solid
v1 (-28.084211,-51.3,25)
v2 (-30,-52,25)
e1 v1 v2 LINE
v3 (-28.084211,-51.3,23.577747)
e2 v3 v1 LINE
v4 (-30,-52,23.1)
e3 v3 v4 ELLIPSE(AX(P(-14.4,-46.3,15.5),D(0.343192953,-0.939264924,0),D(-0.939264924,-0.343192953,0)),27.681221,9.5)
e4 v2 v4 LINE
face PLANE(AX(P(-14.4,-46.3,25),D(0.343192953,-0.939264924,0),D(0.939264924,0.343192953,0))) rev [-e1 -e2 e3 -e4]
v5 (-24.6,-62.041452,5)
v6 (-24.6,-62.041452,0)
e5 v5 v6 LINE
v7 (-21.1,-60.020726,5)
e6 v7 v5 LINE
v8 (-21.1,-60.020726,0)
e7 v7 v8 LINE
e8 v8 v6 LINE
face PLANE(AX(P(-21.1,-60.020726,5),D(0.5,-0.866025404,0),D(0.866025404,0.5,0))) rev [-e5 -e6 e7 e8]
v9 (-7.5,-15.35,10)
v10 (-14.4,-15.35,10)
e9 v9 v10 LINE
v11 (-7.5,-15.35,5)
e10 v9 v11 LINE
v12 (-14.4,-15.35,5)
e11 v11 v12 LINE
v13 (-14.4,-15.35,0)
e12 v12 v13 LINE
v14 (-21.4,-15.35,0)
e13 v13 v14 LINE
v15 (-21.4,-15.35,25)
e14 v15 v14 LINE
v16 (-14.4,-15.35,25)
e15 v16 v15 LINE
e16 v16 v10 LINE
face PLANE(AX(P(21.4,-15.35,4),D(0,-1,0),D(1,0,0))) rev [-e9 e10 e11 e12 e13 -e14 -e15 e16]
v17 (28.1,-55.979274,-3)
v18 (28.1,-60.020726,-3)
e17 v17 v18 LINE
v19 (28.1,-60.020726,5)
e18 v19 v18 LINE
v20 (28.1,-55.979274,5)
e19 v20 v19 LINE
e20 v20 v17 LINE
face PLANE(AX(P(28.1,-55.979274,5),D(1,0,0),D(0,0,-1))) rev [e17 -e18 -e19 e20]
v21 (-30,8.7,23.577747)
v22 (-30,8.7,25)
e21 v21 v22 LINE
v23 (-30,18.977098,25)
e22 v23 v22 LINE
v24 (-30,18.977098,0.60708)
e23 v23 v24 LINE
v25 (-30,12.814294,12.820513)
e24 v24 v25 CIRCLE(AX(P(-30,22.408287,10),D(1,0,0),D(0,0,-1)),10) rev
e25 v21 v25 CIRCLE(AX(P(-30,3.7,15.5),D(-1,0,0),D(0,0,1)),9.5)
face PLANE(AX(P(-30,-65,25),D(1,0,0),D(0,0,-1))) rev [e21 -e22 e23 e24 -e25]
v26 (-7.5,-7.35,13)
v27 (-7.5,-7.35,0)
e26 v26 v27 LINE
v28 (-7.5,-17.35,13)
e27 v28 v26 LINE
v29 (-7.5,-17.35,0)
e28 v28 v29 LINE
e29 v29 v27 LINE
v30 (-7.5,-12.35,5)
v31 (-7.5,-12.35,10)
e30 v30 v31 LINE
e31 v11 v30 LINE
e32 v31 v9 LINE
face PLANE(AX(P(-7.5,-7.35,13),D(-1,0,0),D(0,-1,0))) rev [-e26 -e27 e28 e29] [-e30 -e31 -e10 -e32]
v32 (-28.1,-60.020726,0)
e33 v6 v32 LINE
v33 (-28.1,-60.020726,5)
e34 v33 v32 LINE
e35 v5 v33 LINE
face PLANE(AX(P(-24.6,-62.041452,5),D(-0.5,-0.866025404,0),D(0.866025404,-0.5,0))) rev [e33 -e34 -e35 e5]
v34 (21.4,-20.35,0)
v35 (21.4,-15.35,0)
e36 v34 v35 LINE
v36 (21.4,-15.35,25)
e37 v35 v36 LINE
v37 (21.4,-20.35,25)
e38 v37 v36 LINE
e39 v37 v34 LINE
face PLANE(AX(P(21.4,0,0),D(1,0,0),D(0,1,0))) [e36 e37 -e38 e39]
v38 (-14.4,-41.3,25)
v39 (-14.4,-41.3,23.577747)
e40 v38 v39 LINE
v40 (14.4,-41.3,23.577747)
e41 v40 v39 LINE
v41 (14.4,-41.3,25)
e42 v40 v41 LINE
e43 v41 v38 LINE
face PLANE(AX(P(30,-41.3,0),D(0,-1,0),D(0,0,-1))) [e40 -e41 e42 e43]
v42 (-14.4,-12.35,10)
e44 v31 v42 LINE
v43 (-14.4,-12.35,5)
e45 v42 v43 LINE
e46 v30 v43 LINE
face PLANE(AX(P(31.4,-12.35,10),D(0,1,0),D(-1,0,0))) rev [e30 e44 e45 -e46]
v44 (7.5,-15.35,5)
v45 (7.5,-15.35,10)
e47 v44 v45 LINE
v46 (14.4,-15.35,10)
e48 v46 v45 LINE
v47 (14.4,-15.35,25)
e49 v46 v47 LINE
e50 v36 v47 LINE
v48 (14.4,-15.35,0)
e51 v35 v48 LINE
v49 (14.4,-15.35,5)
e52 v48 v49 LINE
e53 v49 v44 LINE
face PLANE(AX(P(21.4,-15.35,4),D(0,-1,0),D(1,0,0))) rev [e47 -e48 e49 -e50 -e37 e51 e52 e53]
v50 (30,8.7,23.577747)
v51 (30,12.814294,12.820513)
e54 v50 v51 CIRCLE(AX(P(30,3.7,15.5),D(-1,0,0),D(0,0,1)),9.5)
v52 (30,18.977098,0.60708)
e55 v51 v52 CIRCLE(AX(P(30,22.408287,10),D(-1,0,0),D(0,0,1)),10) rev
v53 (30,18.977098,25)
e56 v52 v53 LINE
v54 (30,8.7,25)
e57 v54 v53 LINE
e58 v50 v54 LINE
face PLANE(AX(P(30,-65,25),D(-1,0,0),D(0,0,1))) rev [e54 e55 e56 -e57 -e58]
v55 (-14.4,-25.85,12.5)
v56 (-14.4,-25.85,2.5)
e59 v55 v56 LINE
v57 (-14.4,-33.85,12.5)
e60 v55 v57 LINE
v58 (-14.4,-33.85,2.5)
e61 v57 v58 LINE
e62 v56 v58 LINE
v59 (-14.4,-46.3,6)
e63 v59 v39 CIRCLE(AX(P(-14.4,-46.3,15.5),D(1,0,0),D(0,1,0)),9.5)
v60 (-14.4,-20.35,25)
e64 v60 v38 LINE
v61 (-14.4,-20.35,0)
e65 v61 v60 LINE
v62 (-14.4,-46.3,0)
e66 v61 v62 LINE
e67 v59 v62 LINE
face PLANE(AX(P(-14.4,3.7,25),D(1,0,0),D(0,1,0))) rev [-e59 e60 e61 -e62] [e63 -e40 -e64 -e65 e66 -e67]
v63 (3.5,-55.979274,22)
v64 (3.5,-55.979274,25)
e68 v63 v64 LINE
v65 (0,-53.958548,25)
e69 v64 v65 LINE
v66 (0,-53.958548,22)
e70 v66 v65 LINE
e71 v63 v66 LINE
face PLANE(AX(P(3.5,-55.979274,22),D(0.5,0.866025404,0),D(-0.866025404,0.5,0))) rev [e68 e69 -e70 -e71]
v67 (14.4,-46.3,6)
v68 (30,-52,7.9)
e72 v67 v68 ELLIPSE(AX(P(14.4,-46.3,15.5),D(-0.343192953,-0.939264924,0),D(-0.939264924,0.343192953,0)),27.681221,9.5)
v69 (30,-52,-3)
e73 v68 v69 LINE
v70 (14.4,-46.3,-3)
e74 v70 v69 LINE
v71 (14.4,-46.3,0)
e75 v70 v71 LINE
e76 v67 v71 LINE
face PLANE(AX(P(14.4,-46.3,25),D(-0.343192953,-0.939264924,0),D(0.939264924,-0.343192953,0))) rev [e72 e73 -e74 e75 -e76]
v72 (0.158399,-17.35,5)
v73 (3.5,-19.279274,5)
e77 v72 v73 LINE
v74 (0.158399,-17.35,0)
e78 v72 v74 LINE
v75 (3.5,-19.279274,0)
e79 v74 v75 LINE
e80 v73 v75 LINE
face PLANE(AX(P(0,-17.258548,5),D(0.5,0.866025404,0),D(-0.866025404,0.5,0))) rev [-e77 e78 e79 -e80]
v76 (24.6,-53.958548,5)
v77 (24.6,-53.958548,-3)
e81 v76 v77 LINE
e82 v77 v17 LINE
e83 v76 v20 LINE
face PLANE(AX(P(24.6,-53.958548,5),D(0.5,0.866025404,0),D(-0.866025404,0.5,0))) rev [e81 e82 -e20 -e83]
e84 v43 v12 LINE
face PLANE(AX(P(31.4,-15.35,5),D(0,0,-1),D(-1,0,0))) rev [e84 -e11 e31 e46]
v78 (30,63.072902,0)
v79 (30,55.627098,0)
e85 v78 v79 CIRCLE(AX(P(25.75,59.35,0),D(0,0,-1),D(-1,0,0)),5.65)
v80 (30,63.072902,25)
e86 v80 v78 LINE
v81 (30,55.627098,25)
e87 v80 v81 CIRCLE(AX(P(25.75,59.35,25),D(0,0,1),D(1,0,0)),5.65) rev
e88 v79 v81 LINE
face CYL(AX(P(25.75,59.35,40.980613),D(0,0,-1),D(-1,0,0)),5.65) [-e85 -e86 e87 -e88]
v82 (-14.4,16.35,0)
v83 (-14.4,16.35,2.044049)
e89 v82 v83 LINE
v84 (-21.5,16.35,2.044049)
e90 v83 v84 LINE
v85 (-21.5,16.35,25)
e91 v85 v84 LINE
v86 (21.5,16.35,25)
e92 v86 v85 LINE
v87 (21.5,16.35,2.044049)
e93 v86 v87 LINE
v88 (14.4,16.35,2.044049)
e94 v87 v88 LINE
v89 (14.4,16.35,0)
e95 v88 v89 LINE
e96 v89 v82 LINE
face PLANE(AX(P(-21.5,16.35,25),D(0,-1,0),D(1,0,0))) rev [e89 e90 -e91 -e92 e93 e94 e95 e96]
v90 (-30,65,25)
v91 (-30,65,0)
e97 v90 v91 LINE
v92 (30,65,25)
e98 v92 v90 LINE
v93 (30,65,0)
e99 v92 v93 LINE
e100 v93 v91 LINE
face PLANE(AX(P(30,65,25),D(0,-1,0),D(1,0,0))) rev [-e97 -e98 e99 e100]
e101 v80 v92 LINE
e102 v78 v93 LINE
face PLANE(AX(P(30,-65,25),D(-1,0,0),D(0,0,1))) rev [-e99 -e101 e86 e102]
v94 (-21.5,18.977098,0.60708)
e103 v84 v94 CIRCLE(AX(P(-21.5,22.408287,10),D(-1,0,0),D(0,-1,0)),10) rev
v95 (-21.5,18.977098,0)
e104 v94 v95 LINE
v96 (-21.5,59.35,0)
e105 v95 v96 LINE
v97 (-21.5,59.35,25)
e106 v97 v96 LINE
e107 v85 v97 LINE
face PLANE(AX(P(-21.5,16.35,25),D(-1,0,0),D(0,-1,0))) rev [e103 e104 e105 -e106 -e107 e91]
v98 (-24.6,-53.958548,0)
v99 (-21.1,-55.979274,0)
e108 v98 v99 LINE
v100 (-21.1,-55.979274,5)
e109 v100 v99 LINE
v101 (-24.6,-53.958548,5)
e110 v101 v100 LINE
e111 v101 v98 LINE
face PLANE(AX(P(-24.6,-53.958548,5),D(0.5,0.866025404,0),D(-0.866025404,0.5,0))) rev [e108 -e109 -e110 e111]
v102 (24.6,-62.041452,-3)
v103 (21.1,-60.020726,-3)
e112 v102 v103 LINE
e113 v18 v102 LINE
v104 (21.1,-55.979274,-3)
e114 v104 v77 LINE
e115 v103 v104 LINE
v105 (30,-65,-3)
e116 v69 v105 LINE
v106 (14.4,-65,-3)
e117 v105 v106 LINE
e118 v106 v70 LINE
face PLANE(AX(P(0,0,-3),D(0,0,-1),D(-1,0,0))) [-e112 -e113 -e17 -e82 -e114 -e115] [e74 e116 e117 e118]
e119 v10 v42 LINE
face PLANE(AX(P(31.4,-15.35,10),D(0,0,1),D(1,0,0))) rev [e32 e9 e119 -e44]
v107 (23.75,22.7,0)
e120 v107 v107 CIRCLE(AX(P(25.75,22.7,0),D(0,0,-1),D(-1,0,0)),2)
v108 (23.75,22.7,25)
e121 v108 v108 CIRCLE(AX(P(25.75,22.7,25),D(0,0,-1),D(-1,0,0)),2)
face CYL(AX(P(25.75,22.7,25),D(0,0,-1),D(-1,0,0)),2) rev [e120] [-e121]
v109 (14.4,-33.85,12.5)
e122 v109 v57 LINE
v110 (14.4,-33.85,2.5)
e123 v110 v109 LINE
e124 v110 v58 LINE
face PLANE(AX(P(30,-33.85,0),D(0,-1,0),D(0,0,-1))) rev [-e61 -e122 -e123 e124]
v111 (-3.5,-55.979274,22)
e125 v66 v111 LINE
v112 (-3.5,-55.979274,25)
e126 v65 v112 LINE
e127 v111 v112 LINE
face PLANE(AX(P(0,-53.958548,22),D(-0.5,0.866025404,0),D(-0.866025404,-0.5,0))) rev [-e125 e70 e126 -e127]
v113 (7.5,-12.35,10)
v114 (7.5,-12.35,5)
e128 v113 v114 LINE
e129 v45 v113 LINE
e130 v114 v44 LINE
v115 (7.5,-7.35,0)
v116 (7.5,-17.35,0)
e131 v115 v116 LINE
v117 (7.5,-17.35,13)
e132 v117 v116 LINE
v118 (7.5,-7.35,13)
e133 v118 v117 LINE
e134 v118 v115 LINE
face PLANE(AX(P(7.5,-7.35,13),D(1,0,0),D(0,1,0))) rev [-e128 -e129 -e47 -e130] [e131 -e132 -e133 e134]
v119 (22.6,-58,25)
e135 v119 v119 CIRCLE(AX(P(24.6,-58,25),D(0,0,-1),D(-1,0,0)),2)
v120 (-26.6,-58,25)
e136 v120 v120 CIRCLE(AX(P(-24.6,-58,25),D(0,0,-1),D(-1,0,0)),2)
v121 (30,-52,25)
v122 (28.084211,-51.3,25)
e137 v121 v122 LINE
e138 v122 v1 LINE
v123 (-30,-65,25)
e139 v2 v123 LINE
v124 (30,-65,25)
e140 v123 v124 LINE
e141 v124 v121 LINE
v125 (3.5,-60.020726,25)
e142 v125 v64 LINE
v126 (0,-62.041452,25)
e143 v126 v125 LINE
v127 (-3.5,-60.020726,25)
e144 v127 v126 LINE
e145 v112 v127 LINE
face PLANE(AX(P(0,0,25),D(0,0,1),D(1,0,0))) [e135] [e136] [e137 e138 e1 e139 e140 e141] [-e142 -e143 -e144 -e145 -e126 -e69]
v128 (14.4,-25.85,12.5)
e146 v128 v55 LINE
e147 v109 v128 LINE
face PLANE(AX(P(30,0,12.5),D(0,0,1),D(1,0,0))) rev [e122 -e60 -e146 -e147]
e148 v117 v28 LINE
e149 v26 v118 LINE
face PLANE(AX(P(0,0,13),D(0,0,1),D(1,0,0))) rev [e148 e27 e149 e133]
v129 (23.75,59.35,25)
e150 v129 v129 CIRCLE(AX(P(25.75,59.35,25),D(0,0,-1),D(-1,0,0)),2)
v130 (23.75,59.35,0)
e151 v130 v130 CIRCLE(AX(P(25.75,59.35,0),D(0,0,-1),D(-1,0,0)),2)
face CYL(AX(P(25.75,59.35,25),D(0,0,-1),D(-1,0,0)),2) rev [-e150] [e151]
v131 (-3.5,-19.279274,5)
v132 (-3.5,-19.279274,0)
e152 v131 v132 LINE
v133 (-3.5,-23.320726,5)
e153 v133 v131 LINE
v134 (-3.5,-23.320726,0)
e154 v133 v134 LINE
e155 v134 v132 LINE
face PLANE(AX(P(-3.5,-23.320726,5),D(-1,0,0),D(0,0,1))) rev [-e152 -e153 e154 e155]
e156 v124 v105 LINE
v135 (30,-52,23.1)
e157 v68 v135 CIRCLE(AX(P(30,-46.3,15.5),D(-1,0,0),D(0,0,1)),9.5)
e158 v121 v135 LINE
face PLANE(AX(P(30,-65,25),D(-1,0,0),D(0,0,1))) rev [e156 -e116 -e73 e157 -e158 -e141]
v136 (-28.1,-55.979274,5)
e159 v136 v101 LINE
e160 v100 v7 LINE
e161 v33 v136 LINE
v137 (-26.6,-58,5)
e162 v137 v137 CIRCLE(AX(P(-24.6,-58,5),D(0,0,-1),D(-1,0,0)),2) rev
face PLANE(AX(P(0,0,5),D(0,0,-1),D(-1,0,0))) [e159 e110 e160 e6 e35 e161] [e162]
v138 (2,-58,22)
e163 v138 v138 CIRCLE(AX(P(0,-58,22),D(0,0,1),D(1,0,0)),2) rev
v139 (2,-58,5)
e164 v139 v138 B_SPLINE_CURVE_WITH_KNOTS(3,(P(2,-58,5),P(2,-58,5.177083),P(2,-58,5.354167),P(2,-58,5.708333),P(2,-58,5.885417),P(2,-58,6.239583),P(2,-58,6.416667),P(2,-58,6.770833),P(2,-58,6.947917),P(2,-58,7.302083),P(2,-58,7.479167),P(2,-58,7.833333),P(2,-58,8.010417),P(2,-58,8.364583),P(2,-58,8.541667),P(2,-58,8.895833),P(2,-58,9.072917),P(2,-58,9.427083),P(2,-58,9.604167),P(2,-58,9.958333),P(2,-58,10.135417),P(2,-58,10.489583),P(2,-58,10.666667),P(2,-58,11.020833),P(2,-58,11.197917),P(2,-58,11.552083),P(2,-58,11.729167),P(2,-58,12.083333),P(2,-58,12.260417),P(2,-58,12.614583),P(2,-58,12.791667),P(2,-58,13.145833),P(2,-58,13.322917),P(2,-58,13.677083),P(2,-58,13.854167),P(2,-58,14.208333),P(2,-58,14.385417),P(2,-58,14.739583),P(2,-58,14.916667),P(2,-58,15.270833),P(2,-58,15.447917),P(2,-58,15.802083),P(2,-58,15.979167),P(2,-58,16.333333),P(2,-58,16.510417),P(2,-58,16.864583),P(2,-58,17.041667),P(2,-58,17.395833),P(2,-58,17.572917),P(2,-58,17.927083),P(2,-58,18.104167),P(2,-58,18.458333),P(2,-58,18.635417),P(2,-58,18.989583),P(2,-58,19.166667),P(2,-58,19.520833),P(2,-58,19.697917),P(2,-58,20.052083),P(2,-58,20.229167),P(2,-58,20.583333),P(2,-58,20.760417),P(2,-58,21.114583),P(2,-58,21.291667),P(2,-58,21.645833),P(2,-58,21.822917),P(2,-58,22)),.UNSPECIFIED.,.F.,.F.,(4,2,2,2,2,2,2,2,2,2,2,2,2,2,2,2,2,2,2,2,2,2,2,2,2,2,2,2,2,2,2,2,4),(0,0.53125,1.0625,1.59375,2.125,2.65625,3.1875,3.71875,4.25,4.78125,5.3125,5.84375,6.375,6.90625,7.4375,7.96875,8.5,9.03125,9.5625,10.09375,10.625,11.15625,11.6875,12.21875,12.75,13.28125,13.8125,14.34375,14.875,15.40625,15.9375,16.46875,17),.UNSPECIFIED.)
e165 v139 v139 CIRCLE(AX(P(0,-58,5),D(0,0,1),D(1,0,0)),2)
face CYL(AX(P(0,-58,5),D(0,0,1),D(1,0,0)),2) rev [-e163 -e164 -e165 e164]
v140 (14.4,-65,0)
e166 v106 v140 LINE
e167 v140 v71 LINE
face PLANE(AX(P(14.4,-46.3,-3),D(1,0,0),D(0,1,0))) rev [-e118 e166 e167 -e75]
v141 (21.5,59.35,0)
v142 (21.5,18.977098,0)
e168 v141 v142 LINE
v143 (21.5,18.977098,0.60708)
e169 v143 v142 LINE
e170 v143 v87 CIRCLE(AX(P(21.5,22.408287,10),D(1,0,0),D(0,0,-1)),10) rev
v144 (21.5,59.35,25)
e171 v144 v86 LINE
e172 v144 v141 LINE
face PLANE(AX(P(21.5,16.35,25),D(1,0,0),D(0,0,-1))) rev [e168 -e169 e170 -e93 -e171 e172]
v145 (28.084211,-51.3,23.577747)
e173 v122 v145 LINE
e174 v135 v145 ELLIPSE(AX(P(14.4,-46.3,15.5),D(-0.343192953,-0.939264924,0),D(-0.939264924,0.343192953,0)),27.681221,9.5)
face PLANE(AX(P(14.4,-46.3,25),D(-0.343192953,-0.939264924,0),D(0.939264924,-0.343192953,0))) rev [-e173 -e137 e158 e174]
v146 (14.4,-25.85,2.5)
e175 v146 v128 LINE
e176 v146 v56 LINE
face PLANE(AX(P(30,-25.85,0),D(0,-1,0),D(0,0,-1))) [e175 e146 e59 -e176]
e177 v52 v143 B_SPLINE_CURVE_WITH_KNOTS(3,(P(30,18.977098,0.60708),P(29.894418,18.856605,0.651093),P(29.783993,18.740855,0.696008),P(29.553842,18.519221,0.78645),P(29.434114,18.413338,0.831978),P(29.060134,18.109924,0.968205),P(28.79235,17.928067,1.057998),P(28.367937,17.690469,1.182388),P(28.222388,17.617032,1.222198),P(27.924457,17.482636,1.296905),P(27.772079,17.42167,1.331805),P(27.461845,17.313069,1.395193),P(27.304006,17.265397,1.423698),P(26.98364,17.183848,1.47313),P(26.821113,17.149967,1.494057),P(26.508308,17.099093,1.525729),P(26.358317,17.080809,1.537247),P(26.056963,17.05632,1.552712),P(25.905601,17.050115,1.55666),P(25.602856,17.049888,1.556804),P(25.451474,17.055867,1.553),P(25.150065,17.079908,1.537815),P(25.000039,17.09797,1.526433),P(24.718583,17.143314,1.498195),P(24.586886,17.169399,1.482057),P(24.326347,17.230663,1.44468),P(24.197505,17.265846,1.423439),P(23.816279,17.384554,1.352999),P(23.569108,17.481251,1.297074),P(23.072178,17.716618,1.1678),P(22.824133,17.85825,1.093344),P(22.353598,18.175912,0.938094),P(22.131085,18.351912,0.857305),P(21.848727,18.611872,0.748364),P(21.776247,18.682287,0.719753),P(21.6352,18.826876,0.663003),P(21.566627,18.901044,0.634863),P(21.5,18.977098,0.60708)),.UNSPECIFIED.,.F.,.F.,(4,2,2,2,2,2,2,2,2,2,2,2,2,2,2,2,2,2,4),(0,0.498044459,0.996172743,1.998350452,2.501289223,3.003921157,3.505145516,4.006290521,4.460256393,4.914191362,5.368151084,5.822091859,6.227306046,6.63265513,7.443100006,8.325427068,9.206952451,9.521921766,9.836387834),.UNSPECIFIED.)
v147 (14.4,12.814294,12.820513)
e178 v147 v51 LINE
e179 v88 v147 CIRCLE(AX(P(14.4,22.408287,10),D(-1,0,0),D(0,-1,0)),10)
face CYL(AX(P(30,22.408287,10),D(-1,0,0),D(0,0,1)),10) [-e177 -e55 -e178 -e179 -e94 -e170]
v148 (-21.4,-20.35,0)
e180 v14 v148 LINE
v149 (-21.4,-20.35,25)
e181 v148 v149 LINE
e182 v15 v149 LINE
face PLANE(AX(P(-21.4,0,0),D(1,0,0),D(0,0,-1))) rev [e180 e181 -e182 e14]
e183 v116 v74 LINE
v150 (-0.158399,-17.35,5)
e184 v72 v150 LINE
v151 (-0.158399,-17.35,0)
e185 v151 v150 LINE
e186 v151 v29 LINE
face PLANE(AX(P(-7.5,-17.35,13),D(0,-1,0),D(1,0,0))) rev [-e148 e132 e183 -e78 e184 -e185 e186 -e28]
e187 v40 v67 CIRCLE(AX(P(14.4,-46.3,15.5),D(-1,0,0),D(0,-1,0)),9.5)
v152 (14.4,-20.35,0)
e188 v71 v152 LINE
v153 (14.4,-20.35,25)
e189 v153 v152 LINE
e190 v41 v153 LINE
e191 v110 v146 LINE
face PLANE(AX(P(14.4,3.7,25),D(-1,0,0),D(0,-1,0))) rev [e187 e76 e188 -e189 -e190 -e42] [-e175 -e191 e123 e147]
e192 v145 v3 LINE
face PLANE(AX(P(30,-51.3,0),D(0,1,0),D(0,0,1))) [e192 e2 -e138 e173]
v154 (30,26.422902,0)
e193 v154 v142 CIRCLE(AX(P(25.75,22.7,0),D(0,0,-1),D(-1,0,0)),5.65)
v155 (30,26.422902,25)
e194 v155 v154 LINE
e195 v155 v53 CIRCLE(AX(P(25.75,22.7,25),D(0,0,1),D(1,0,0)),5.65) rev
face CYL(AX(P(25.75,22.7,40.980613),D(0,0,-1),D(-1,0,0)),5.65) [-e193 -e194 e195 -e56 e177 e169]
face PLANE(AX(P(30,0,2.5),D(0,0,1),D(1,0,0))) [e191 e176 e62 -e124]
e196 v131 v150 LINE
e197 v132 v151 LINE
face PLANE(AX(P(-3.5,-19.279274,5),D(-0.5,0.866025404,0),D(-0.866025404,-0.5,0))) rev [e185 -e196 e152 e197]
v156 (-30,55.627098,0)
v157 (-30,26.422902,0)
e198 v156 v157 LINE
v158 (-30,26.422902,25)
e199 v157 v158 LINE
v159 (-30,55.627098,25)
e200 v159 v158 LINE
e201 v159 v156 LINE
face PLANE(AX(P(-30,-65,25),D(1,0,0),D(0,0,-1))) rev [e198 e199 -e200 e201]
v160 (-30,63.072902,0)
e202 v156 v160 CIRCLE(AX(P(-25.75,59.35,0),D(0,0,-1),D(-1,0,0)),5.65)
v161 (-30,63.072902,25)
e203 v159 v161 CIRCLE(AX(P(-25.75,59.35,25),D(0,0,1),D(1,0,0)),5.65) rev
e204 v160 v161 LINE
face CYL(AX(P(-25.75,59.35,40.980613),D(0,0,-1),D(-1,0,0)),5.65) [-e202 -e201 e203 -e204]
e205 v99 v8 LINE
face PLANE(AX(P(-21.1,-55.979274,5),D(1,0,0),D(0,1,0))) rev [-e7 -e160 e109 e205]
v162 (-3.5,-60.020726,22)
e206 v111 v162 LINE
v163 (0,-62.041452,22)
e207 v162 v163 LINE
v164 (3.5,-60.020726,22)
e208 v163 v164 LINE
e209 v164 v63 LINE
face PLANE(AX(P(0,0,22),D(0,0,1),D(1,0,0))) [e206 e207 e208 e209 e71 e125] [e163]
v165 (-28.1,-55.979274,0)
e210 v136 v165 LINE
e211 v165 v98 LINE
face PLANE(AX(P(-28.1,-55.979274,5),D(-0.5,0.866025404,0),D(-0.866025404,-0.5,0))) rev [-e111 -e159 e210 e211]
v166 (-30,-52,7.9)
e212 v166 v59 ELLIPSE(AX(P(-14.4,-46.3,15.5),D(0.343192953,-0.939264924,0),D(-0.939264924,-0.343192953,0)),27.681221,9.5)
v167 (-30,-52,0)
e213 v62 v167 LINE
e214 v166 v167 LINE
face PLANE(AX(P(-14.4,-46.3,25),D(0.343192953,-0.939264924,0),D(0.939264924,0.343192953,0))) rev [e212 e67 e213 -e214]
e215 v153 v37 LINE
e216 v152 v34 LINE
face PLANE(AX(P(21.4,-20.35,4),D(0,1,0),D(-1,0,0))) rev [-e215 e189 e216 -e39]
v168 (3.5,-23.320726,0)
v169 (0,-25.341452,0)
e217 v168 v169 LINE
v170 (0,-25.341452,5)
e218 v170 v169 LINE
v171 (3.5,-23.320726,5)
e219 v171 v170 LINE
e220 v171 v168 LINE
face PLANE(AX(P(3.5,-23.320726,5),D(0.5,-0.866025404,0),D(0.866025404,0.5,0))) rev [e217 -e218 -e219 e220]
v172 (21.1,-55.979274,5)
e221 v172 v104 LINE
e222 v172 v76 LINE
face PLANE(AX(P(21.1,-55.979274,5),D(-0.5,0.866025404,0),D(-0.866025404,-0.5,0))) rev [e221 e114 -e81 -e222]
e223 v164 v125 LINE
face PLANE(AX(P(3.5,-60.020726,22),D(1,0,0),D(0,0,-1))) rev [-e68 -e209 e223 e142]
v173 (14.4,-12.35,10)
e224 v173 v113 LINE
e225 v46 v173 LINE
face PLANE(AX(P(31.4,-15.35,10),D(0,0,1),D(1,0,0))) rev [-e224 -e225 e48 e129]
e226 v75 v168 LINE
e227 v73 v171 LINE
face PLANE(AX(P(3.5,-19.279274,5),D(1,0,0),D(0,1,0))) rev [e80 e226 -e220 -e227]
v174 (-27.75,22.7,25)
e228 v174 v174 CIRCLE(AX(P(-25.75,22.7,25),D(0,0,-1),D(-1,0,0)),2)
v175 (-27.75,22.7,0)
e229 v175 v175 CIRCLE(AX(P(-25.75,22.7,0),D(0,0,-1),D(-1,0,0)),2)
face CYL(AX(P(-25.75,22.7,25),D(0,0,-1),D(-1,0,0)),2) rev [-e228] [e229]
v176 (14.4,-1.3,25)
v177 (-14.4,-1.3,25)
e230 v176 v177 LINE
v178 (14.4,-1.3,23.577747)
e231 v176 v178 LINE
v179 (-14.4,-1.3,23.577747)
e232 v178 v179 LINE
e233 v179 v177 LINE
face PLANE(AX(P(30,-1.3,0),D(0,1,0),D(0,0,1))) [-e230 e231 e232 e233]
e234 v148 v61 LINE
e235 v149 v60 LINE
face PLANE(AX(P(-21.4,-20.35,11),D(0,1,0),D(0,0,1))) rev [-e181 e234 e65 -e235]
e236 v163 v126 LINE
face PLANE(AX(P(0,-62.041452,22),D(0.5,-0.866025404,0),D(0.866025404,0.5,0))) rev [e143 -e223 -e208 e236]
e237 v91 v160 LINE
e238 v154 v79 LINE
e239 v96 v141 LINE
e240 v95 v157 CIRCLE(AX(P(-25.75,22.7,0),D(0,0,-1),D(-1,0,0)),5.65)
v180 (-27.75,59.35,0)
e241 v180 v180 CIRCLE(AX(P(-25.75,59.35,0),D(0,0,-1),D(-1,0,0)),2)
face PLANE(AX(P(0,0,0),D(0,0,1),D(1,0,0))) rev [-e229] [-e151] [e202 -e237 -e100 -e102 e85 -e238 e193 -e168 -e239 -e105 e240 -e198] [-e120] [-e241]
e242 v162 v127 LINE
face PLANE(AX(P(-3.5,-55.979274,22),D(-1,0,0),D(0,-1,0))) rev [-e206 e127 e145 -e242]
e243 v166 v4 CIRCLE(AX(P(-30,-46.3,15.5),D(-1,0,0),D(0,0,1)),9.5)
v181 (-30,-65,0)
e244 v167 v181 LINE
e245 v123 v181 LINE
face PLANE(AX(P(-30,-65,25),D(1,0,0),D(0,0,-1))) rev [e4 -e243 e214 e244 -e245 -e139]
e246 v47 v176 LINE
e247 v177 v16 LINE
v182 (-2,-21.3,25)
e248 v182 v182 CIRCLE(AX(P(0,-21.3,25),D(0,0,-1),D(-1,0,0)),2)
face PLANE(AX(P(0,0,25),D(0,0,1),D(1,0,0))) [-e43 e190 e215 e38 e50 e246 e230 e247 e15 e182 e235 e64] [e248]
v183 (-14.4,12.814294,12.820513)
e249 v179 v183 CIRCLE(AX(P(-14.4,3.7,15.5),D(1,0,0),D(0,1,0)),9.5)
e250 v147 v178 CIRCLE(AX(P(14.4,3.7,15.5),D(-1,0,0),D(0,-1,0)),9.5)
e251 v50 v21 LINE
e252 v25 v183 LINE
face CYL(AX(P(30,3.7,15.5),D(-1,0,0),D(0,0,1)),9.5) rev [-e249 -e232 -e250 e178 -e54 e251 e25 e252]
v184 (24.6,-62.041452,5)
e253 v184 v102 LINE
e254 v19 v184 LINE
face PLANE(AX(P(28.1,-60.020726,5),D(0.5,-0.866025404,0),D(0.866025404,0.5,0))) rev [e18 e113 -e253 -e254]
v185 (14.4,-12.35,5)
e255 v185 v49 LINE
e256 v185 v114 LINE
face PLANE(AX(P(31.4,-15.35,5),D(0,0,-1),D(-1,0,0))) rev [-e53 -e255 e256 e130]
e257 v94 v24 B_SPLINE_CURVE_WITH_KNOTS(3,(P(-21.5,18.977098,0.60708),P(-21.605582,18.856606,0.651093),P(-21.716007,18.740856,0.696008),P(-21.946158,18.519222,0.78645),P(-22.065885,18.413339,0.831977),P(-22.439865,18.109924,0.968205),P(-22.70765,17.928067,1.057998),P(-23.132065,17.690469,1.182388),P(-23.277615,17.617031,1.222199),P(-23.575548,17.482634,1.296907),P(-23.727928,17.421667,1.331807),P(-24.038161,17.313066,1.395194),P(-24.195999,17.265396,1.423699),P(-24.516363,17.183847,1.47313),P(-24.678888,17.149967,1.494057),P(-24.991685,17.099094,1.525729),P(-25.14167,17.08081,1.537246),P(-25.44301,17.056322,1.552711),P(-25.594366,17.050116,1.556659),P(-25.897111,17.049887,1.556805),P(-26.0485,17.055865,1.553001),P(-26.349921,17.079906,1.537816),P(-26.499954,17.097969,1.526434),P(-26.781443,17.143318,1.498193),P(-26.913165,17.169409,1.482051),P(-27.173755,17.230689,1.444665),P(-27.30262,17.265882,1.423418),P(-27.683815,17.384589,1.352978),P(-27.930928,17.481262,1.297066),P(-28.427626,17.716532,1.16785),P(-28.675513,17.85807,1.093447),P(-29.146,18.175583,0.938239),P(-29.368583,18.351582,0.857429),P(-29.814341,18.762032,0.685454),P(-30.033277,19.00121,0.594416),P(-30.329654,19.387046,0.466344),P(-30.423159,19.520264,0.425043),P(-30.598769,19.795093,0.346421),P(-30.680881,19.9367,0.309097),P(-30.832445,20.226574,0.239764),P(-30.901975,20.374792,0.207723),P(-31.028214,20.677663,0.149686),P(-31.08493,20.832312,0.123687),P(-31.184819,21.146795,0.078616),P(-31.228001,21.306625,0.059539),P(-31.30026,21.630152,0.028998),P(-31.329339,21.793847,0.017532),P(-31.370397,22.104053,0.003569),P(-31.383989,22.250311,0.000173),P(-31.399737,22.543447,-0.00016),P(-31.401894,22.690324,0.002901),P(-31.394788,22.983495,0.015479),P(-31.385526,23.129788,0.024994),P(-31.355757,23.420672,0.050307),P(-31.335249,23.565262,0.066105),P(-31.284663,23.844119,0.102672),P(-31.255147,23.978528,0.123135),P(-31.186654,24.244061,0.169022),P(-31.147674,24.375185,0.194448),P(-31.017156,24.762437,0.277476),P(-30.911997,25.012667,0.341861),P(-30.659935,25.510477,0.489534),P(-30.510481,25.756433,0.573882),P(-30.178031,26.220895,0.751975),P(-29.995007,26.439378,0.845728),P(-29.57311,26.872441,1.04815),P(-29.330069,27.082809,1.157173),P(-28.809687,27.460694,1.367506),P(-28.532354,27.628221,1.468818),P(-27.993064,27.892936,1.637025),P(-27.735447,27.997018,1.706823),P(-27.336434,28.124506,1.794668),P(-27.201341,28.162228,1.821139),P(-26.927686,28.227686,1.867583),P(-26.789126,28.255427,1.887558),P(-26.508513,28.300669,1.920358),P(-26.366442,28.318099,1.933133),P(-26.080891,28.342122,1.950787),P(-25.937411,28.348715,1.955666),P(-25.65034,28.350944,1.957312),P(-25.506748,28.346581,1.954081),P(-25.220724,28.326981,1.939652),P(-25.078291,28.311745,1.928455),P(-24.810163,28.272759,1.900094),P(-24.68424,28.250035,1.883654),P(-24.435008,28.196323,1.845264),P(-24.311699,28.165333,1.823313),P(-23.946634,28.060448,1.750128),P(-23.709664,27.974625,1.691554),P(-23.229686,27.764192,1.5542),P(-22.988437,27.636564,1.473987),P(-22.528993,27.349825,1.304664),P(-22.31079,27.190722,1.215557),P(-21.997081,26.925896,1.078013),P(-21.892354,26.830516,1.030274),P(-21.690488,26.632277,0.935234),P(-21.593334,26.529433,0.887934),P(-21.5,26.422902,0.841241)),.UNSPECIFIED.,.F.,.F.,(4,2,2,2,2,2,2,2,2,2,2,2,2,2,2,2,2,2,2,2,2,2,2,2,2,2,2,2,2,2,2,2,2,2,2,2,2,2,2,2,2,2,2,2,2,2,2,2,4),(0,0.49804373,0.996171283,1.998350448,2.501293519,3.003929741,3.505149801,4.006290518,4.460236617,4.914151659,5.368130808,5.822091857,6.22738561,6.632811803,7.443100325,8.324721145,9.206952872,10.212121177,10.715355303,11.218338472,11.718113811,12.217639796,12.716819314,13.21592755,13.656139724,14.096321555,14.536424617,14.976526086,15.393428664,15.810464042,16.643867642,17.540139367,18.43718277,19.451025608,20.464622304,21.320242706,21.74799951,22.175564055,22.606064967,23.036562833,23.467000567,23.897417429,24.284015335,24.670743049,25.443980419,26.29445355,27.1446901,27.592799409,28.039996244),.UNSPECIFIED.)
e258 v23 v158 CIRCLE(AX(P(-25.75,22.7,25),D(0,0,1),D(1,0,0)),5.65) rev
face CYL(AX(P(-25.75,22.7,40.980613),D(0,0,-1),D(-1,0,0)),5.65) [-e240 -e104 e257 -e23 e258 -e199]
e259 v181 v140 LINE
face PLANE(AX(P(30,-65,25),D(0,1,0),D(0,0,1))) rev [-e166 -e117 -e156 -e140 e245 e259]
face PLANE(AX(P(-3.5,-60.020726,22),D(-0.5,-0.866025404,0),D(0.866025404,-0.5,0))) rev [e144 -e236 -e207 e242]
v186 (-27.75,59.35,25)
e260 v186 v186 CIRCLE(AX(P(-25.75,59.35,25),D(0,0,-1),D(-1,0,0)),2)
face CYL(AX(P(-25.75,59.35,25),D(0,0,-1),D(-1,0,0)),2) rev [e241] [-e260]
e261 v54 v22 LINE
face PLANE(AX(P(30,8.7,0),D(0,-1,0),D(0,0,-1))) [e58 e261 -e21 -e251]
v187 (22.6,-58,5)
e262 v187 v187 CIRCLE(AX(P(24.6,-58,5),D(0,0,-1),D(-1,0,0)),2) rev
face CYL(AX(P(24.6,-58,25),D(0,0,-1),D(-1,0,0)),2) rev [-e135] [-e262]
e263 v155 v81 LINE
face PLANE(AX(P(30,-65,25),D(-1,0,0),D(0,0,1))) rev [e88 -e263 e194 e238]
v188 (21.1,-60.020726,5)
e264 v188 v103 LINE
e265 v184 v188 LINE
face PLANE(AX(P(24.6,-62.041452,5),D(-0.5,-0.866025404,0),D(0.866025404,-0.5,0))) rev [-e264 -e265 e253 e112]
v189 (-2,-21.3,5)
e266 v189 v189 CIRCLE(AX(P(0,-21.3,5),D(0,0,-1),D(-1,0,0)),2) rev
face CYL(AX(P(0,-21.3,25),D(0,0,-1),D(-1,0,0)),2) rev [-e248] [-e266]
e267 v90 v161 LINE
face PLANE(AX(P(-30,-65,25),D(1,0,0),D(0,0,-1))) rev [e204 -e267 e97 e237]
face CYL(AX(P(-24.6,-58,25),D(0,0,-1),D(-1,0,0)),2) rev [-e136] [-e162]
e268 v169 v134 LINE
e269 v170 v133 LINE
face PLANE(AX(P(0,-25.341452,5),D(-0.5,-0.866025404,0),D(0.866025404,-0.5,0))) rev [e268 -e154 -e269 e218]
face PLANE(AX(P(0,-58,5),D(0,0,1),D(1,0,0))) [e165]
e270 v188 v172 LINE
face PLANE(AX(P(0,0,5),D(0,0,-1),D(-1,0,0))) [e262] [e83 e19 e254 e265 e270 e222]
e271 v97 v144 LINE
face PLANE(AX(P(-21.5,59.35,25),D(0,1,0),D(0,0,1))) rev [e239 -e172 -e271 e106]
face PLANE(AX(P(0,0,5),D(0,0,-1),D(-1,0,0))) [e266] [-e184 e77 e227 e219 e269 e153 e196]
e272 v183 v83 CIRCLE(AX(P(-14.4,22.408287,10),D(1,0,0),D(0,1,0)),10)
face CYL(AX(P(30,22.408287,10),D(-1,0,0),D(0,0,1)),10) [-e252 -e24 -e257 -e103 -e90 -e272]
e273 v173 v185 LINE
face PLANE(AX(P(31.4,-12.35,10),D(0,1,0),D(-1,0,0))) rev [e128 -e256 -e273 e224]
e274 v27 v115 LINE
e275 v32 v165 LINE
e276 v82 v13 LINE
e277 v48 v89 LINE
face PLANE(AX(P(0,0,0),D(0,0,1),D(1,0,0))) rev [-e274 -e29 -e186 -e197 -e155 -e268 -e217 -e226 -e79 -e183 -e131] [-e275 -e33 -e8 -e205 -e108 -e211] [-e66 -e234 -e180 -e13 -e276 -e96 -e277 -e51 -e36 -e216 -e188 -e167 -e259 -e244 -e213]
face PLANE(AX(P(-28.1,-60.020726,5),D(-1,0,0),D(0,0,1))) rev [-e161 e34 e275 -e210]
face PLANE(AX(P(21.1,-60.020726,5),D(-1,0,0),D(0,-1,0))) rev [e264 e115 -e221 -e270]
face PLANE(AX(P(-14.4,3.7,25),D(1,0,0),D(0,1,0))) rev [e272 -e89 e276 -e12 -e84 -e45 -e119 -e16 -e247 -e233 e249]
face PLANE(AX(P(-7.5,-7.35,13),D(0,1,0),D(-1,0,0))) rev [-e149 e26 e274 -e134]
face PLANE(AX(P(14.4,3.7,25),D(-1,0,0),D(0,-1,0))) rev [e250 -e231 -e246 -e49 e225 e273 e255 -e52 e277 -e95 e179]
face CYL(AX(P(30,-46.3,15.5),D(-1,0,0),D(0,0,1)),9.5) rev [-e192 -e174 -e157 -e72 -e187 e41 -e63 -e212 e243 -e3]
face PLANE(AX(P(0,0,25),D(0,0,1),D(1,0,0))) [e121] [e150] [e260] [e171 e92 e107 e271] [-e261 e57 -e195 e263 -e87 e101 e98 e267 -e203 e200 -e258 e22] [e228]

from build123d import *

# Parameters (mm, degrees)
SKETCH_1_W          = 60
SKETCH_1_H          = 130
EXTRUDE_1_DEPTH     = 25
SKETCH_2_W          = 43
SKETCH_2_H          = 43
CUT_EXTRUDE_1_DEPTH = 76.828754441
SKETCH_3_W          = 10
SKETCH_3_H          = 8
CUT_EXTRUDE_2_DEPTH = 92.923881554
FILLET_1_R          = 20
FILLET_2_R          = 10
SKETCH_4_R          = 2
CUT_EXTRUDE_3_DEPTH = 76.828754441
EXTRUDE_2_REACH     = 77.829
SKETCH_5_R          = 4.25
SKETCH_5_R_2        = 2
SKETCH_6_R          = 2
EXTRUDE_3_DEPTH     = 25
CUT_EXTRUDE_4_DEPTH = 5
SKETCH_8_R          = 2
CUT_EXTRUDE_5_DEPTH = 20
CUT_EXTRUDE_6_DEPTH = 3
SKETCH_11_W         = 7
SKETCH_11_H         = 5
EXTRUDE_5_DEPTH     = 7
SKETCH_12_W         = 7
SKETCH_12_H         = 5
EXTRUDE_6_DEPTH     = 7
SKETCH_13_W         = 7
SKETCH_13_H         = 5
EXTRUDE_7_DEPTH     = 4
SKETCH_17_W         = 7
SKETCH_17_H         = 5
EXTRUDE_8_DEPTH     = 14
EXTRUDE_9_DEPTH     = 3
SKETCH_19_W         = 5
SKETCH_19_H         = 3
CUT_EXTRUDE_7_DEPTH = 84.352504546
SKETCH_20_W         = 15
SKETCH_20_H         = 10
CUT_EXTRUDE_8_DEPTH = 13


with BuildPart() as part:
    # Эскиз1 → Бобышка-Вытянуть1 (new body)
    with BuildSketch(Plane.XY):
        Rectangle(SKETCH_1_W, SKETCH_1_H)
    extrude(amount=EXTRUDE_1_DEPTH)

    # Эскиз2 → Вырез-Вытянуть1 (cut, through all)
    with BuildSketch(Plane(origin=(0, 0, 0), x_dir=(-1, 0, 0), z_dir=(0, 0, -1))):
        Polygon((-30, 3.7), (-14.4, 3.7), (-14.4, -46.3), (-30, -52), align=None)
        with Locations((0, 37.85)):
            Rectangle(SKETCH_2_W, SKETCH_2_H)
        Polygon((14.4, -46.3), (30, -52), (30, 3.7), (14.4, 3.7), align=None)
    extrude(amount=-CUT_EXTRUDE_1_DEPTH, mode=Mode.SUBTRACT)

    # Эскиз3 → Вырез-Вытянуть2 (cut, through all)
    with BuildSketch(Plane.ZY.offset(30)):
        with BuildLine():
            Line((23.577747211, 8.7), (25, 8.7))
            Line((25, 8.7), (25, 3.7))
            Line((25, 3.7), (25, -1.3))
            Line((25, -1.3), (23.577747211, -1.3))
            ThreePointArc((23.577747211, -1.3), (6, 3.7), (23.577747211, 8.7))
        make_face()
        with BuildLine():
            Line((25, -41.3), (23.577747211, -41.3))
            ThreePointArc((23.577747211, -41.3), (10.144669889, -38.453316662), (7.9, -52))
            Line((7.9, -52), (23.1, -52))
            ThreePointArc((23.1, -52), (23.346683338, -51.655330111), (23.577747211, -51.3))
            Line((23.577747211, -51.3), (25, -51.3))
            Line((25, -51.3), (25, -46.3))
            Line((25, -46.3), (25, -41.3))
        make_face()
        with Locations((7.5, -29.85)):
            Rectangle(SKETCH_3_W, SKETCH_3_H)
        with BuildLine():
            Line((23.1, -52), (7.9, -52))
            ThreePointArc((7.9, -52), (15.5, -55.8), (23.1, -52))
        make_face()
    extrude(amount=-CUT_EXTRUDE_2_DEPTH, mode=Mode.SUBTRACT)

    # Скругление1
    # the kernel refuses this fillet: 20 mm, written as the material it takes off along each edge
    with BuildSketch(Plane(origin=(-65.707142143, 3.7, 0), x_dir=(0, 1, 0), z_dir=(1, 0, 0))) as fillet_1_piece_1:
        with BuildLine():
            CenterArc((14.282856857, 20), FILLET_1_R, 224.427004001, 45.572995999)
            Line((0, 6), (-0.285657137, 5.72))
            ThreePointArc((-0.285657137, 5.72), (-0.4, 3), (-0.4, 0))
            Line((-0.4, 0), (0, -0.4))
            Line((0, -0.4), (14.282856857, -0.4))
            Line((14.282856857, -0.4), (14.282856857, 0))
        make_face()
    extrude(amount=51.307142143, mode=Mode.SUBTRACT)
    with BuildSketch(Plane(origin=(-65.707142143, 3.7, 0), x_dir=(0, 1, 0), z_dir=(1, 0, 0))) as fillet_1_piece_2_section:
        with BuildLine():
            CenterArc((14.282856857, 20), FILLET_1_R, 224.427004001, 45.572995999)
            Line((0, 6), (-0.285657137, 5.72))
            ThreePointArc((-0.285657137, 5.72), (-0.4, 3), (-0.4, 0))
            Line((-0.4, 0), (0, -0.4))
            Line((0, -0.4), (14.282856857, -0.4))
            Line((14.282856857, -0.4), (14.282856857, 0))
        make_face()
    fillet_1_piece_2 = extrude(amount=87.014284285, mode=Mode.PRIVATE)
    fillet_1_piece_2 = split(fillet_1_piece_2, bisect_by=Plane(origin=(14.4, 3.7, 0), z_dir=(1, 0, 0)), keep=Keep.TOP, mode=Mode.PRIVATE)
    add(fillet_1_piece_2, mode=Mode.SUBTRACT)
    with BuildSketch(Plane(origin=(65.707142143, 3.7, 0), x_dir=(0, 1, 0), z_dir=(-1, 0, 0))) as fillet_1_piece_3:
        with BuildLine():
            CenterArc((14.282856857, -20), FILLET_1_R, 90, 45.572995999)
            Line((0, -6), (-0.285657137, -5.72))
            ThreePointArc((-0.285657137, -5.72), (-0.4, -3), (-0.4, 0))
            Line((-0.4, 0), (0, 0.4))
            Line((0, 0.4), (14.282856857, 0.4))
            Line((14.282856857, 0.4), (14.282856857, 0))
        make_face()
    extrude(amount=51.307142143, mode=Mode.SUBTRACT)
    with BuildSketch(Plane(origin=(65.707142143, 3.7, 0), x_dir=(0, 1, 0), z_dir=(-1, 0, 0))) as fillet_1_piece_4_section:
        with BuildLine():
            CenterArc((14.282856857, -20), FILLET_1_R, 90, 45.572995999)
            Line((0, -6), (-0.285657137, -5.72))
            ThreePointArc((-0.285657137, -5.72), (-0.4, -3), (-0.4, 0))
            Line((-0.4, 0), (0, 0.4))
            Line((0, 0.4), (14.282856857, 0.4))
            Line((14.282856857, 0.4), (14.282856857, 0))
        make_face()
    fillet_1_piece_4 = extrude(amount=87.014284285, mode=Mode.PRIVATE)
    fillet_1_piece_4 = split(fillet_1_piece_4, bisect_by=Plane(origin=(-14.4, 3.7, 0), z_dir=(-1, 0, 0)), keep=Keep.TOP, mode=Mode.PRIVATE)
    add(fillet_1_piece_4, mode=Mode.SUBTRACT)

    # Скругление2
    # the kernel refuses this fillet: 10 mm, written as the material it takes off along each edge
    with BuildSketch(Plane(origin=(-79.117206761, 3.7, 6), x_dir=(-2.6805272160388098e-14, 0.8006407690254324, 0.5991446895152824), z_dir=(1, 0, 0))) as fillet_2_piece_1:
        with BuildLine():
            CenterArc((17.375195996, -8.00640769), FILLET_2_R, 126.808665073, 106.382669854)
            Line((11.383749101, -16.012815381), (10.784604411, -16.81345615))
            ThreePointArc((10.784604411, -16.81345615), (7.241424671, -14.16198322), (-0.991173158, -0.132573646))
            Line((-0.991173158, -0.132573646), (0.59914469, 0.800640769))
            ThreePointArc((0.59914469, 0.800640769), (5.69187455, -0.893912694), (10.784604411, 0.800640769))
            Line((10.784604411, 0.800640769), (11.383749101, 0))
        make_face()
    extrude(amount=64.717206761, mode=Mode.SUBTRACT)
    with BuildSketch(Plane(origin=(-79.117206761, 3.7, 6), x_dir=(-2.6805272160388098e-14, 0.8006407690254324, 0.5991446895152824), z_dir=(1, 0, 0))) as fillet_2_piece_2_section:
        with BuildLine():
            CenterArc((17.375195996, -8.00640769), FILLET_2_R, 126.808665073, 106.382669854)
            Line((11.383749101, -16.012815381), (10.784604411, -16.81345615))
            ThreePointArc((10.784604411, -16.81345615), (7.241424671, -14.16198322), (-0.991173158, -0.132573646))
            Line((-0.991173158, -0.132573646), (0.59914469, 0.800640769))
            ThreePointArc((0.59914469, 0.800640769), (5.69187455, -0.893912694), (10.784604411, 0.800640769))
            Line((10.784604411, 0.800640769), (11.383749101, 0))
        make_face()
    fillet_2_piece_2 = extrude(amount=113.834413522, mode=Mode.PRIVATE)
    fillet_2_piece_2 = split(fillet_2_piece_2, bisect_by=Plane(origin=(14.4, 3.7, 6), z_dir=(1, 0, 0)), keep=Keep.TOP, mode=Mode.PRIVATE)
    add(fillet_2_piece_2, mode=Mode.SUBTRACT)
    with BuildSketch(Plane(origin=(79.117206761, 3.7, 6), x_dir=(9.676973105025612e-15, 0.8006407690254272, 0.5991446895152894), z_dir=(-1, 0, 0))) as fillet_2_piece_3:
        with BuildLine():
            CenterArc((17.375195996, 8.00640769), FILLET_2_R, 126.808665073, 106.382669854)
            Line((11.383749101, 16.012815381), (10.784604411, 16.81345615))
            ThreePointArc((10.784604411, 16.81345615), (7.241424671, 14.16198322), (-0.991173158, 0.132573646))
            Line((-0.991173158, 0.132573646), (0.59914469, -0.800640769))
            ThreePointArc((0.59914469, -0.800640769), (5.69187455, 0.893912694), (10.784604411, -0.800640769))
            Line((10.784604411, -0.800640769), (11.383749101, 0))
        make_face()
    extrude(amount=64.717206761, mode=Mode.SUBTRACT)
    with BuildSketch(Plane(origin=(79.117206761, 3.7, 6), x_dir=(9.676973105025612e-15, 0.8006407690254272, 0.5991446895152894), z_dir=(-1, 0, 0))) as fillet_2_piece_4_section:
        with BuildLine():
            CenterArc((17.375195996, 8.00640769), FILLET_2_R, 126.808665073, 106.382669854)
            Line((11.383749101, 16.012815381), (10.784604411, 16.81345615))
            ThreePointArc((10.784604411, 16.81345615), (7.241424671, 14.16198322), (-0.991173158, 0.132573646))
            Line((-0.991173158, 0.132573646), (0.59914469, -0.800640769))
            ThreePointArc((0.59914469, -0.800640769), (5.69187455, 0.893912694), (10.784604411, -0.800640769))
            Line((10.784604411, -0.800640769), (11.383749101, 0))
        make_face()
    fillet_2_piece_4 = extrude(amount=113.834413522, mode=Mode.PRIVATE)
    fillet_2_piece_4 = split(fillet_2_piece_4, bisect_by=Plane(origin=(-14.4, 3.7, 6), z_dir=(-1, 0, 0)), keep=Keep.TOP, mode=Mode.PRIVATE)
    add(fillet_2_piece_4, mode=Mode.SUBTRACT)

    # Эскиз4 → Вырез-Вытянуть3 (cut, through all)
    with BuildSketch(Plane(origin=(0, 0, 0), x_dir=(-1, 0, 0), z_dir=(0, 0, -1))):
        with Locations((-24.6, -58)):
            Circle(SKETCH_4_R)
        with Locations((24.6, -58)):
            Circle(SKETCH_4_R)
        with Locations((0, -21.3)):
            Circle(SKETCH_4_R)
        with Locations((-25.75, 22.7)):
            Circle(SKETCH_4_R)
        with Locations((25.75, 22.7)):
            Circle(SKETCH_4_R)
        with Locations((25.75, 59.35)):
            Circle(SKETCH_4_R)
        with Locations((-25.75, 59.35)):
            Circle(SKETCH_4_R)
    extrude(amount=-CUT_EXTRUDE_3_DEPTH, mode=Mode.SUBTRACT)

    # Эскиз5 → Бобышка-Вытянуть2 (add, up to next)
    with BuildSketch(Plane(origin=(0, 0, 0), x_dir=(-1, 0, 0), z_dir=(0, 0, -1)), mode=Mode.PRIVATE) as extrude_2_sk1:
        with Locations((25.75, 22.7)):
            Circle(SKETCH_5_R)
        with Locations((25.75, 22.7)):
            Circle(SKETCH_5_R_2, mode=Mode.SUBTRACT)
    extrude_2_tool1 = extrude(extrude_2_sk1.sketch, amount=-EXTRUDE_2_REACH, mode=Mode.PRIVATE) - part.part
    # Эскиз5 → Бобышка-Вытянуть2 (add, up to next)
    with BuildSketch(Plane(origin=(0, 0, 0), x_dir=(-1, 0, 0), z_dir=(0, 0, -1)), mode=Mode.PRIVATE) as extrude_2_sk2:
        with Locations((-25.75, 22.7)):
            Circle(SKETCH_5_R)
        with Locations((-25.75, 22.7)):
            Circle(SKETCH_5_R_2, mode=Mode.SUBTRACT)
    extrude_2_tool2 = extrude(extrude_2_sk2.sketch, amount=-EXTRUDE_2_REACH, mode=Mode.PRIVATE) - part.part
    add(extrude_2_tool1.solids().sort_by_distance((-21.620208, 22.7, 0))[0])
    add(extrude_2_tool2.solids().sort_by_distance((29.879792, 22.7, 0))[0])

    # Эскиз6 → Бобышка-Вытянуть3 (add)
    # profile 1 of 4: a face of its own
    with BuildSketch(Plane(origin=(0, 0, 0), x_dir=(-1, 0, 0), z_dir=(0, 0, -1))):
        with BuildLine():
            Line((-21.5, 26.422902094), (-21.5, 18.977097906))
            ThreePointArc((-21.5, 18.977097906), (-31.4, 22.7), (-21.5, 26.422902094))
        make_face()
        with Locations((-25.75, 22.7)):
            Circle(SKETCH_6_R, mode=Mode.SUBTRACT)
    # profile 2 of 4: a face of its own
    with BuildSketch(Plane(origin=(0, 0, 0), x_dir=(-1, 0, 0), z_dir=(0, 0, -1))):
        with BuildLine():
            Line((21.5, 59.35), (20.1, 59.35))
            ThreePointArc((20.1, 59.35), (31.038430769, 61.33871818), (21.5, 55.627097906))
            Line((21.5, 55.627097906), (21.5, 59.35))
        make_face()
        with Locations((25.75, 59.35)):
            Circle(SKETCH_6_R, mode=Mode.SUBTRACT)
    # profile 3 of 4: a face of its own
    with BuildSketch(Plane(origin=(0, 0, 0), x_dir=(-1, 0, 0), z_dir=(0, 0, -1))):
        with BuildLine():
            Line((-21.5, 59.35), (-21.5, 55.627097906))
            ThreePointArc((-21.5, 55.627097906), (-31.038430769, 61.33871818), (-20.1, 59.35))
            Line((-20.1, 59.35), (-21.5, 59.35))
        make_face()
        with Locations((-25.75, 59.35)):
            Circle(SKETCH_6_R, mode=Mode.SUBTRACT)
    # profile 4 of 4: a face of its own
    with BuildSketch(Plane(origin=(0, 0, 0), x_dir=(-1, 0, 0), z_dir=(0, 0, -1))):
        with BuildLine():
            Line((21.5, 26.422902094), (21.5, 18.977097906))
            ThreePointArc((21.5, 18.977097906), (31.4, 22.7), (21.5, 26.422902094))
        make_face()
        with Locations((25.75, 22.7)):
            Circle(SKETCH_6_R, mode=Mode.SUBTRACT)
    extrude(amount=-EXTRUDE_3_DEPTH)

    # Эскиз7 → Вырез-Вытянуть4 (cut)
    with BuildSketch(Plane(origin=(0, 0, 0), x_dir=(-1, 0, 0), z_dir=(0, 0, -1))):
        Polygon((0, -17.258548116), (-3.5, -19.279274058), (-3.5, -23.320725942), (0, -25.341451884), (3.5, -23.320725942), (3.5, -19.279274058), align=None)
        Polygon((-24.6, -53.958548116), (-28.1, -55.979274058), (-28.1, -60.020725942), (-24.6, -62.041451884), (-21.1, -60.020725942), (-21.1, -55.979274058), align=None)
        Polygon((24.6, -53.958548116), (21.1, -55.979274058), (21.1, -60.020725942), (24.6, -62.041451884), (28.1, -60.020725942), (28.1, -55.979274058), align=None)
    extrude(amount=-CUT_EXTRUDE_4_DEPTH, mode=Mode.SUBTRACT)

    # Эскиз8 → Вырез-Вытянуть5 (cut)
    with BuildSketch(Plane.XY.offset(25)):
        with Locations((0, -58)):
            Circle(SKETCH_8_R)
    extrude(amount=-CUT_EXTRUDE_5_DEPTH, mode=Mode.SUBTRACT)

    # Эскиз9 → Вырез-Вытянуть6 (cut)
    with BuildSketch(Plane.XY.offset(25)):
        Polygon((0, -53.958548116), (-3.5, -55.979274058), (-3.5, -60.020725942), (0, -62.041451884), (3.5, -60.020725942), (3.5, -55.979274058), align=None)
    extrude(amount=-CUT_EXTRUDE_6_DEPTH, mode=Mode.SUBTRACT)

    # Эскиз11 → Бобышка-Вытянуть5 (add)
    with BuildSketch(Plane(origin=(14.4, 0, 0), x_dir=(0, 0, -1), z_dir=(1, 0, 0))):
        with Locations((-7.5, -17.85)):
            Rectangle(SKETCH_11_W, SKETCH_11_H)
    extrude(amount=EXTRUDE_5_DEPTH)

    # Эскиз12 → Бобышка-Вытянуть6 (add)
    with BuildSketch(Plane.ZY.offset(14.4)):
        with Locations((7.5, -17.85)):
            Rectangle(SKETCH_12_W, SKETCH_12_H)
    extrude(amount=EXTRUDE_6_DEPTH)

    # Эскиз13 → Бобышка-Вытянуть7 (add)
    with BuildSketch(Plane(origin=(0, 0, 4), x_dir=(-1, 0, 0), z_dir=(0, 0, -1))):
        with Locations((17.9, -17.85)):
            Rectangle(SKETCH_13_W, SKETCH_13_H)
        with Locations((-17.9, -17.85)):
            Rectangle(SKETCH_13_W, SKETCH_13_H)
    extrude(amount=EXTRUDE_7_DEPTH)

    # Эскиз17 → Бобышка-Вытянуть8 (add)
    with BuildSketch(Plane.XY.offset(11)):
        with Locations((17.9, -17.85)):
            Rectangle(SKETCH_17_W, SKETCH_17_H)
        with Locations((-17.9, -17.85)):
            Rectangle(SKETCH_17_W, SKETCH_17_H)
    extrude(amount=EXTRUDE_8_DEPTH)

    # Эскиз18 → Бобышка-Вытянуть9 (add)
    with BuildSketch(Plane(origin=(0, 0, 0), x_dir=(-1, 0, 0), z_dir=(0, 0, -1))):
        Polygon((-30, -52), (-14.4, -46.3), (-14.4, -65), (-30, -65), align=None)
        Polygon((-28.1, -55.979274058), (-24.6, -53.958548116), (-21.1, -55.979274058), (-21.1, -60.020725942), (-24.6, -62.041451884), (-28.1, -60.020725942), align=None, mode=Mode.SUBTRACT)
    extrude(amount=EXTRUDE_9_DEPTH)

    # Эскиз19 → Вырез-Вытянуть7 (cut, through all)
    with BuildSketch(Plane.ZY.offset(14.4)):
        with Locations((7.5, -13.85)):
            Rectangle(SKETCH_19_W, SKETCH_19_H)
    extrude(amount=-CUT_EXTRUDE_7_DEPTH, mode=Mode.SUBTRACT)

    # Эскиз20 → Вырез-Вытянуть8 (cut)
    with BuildSketch(Plane(origin=(0, 0, 0), x_dir=(-1, 0, 0), z_dir=(0, 0, -1))):
        with Locations((0, -12.35)):
            Rectangle(SKETCH_20_W, SKETCH_20_H)
    extrude(amount=-CUT_EXTRUDE_8_DEPTH, mode=Mode.SUBTRACT)


solid = part.part
